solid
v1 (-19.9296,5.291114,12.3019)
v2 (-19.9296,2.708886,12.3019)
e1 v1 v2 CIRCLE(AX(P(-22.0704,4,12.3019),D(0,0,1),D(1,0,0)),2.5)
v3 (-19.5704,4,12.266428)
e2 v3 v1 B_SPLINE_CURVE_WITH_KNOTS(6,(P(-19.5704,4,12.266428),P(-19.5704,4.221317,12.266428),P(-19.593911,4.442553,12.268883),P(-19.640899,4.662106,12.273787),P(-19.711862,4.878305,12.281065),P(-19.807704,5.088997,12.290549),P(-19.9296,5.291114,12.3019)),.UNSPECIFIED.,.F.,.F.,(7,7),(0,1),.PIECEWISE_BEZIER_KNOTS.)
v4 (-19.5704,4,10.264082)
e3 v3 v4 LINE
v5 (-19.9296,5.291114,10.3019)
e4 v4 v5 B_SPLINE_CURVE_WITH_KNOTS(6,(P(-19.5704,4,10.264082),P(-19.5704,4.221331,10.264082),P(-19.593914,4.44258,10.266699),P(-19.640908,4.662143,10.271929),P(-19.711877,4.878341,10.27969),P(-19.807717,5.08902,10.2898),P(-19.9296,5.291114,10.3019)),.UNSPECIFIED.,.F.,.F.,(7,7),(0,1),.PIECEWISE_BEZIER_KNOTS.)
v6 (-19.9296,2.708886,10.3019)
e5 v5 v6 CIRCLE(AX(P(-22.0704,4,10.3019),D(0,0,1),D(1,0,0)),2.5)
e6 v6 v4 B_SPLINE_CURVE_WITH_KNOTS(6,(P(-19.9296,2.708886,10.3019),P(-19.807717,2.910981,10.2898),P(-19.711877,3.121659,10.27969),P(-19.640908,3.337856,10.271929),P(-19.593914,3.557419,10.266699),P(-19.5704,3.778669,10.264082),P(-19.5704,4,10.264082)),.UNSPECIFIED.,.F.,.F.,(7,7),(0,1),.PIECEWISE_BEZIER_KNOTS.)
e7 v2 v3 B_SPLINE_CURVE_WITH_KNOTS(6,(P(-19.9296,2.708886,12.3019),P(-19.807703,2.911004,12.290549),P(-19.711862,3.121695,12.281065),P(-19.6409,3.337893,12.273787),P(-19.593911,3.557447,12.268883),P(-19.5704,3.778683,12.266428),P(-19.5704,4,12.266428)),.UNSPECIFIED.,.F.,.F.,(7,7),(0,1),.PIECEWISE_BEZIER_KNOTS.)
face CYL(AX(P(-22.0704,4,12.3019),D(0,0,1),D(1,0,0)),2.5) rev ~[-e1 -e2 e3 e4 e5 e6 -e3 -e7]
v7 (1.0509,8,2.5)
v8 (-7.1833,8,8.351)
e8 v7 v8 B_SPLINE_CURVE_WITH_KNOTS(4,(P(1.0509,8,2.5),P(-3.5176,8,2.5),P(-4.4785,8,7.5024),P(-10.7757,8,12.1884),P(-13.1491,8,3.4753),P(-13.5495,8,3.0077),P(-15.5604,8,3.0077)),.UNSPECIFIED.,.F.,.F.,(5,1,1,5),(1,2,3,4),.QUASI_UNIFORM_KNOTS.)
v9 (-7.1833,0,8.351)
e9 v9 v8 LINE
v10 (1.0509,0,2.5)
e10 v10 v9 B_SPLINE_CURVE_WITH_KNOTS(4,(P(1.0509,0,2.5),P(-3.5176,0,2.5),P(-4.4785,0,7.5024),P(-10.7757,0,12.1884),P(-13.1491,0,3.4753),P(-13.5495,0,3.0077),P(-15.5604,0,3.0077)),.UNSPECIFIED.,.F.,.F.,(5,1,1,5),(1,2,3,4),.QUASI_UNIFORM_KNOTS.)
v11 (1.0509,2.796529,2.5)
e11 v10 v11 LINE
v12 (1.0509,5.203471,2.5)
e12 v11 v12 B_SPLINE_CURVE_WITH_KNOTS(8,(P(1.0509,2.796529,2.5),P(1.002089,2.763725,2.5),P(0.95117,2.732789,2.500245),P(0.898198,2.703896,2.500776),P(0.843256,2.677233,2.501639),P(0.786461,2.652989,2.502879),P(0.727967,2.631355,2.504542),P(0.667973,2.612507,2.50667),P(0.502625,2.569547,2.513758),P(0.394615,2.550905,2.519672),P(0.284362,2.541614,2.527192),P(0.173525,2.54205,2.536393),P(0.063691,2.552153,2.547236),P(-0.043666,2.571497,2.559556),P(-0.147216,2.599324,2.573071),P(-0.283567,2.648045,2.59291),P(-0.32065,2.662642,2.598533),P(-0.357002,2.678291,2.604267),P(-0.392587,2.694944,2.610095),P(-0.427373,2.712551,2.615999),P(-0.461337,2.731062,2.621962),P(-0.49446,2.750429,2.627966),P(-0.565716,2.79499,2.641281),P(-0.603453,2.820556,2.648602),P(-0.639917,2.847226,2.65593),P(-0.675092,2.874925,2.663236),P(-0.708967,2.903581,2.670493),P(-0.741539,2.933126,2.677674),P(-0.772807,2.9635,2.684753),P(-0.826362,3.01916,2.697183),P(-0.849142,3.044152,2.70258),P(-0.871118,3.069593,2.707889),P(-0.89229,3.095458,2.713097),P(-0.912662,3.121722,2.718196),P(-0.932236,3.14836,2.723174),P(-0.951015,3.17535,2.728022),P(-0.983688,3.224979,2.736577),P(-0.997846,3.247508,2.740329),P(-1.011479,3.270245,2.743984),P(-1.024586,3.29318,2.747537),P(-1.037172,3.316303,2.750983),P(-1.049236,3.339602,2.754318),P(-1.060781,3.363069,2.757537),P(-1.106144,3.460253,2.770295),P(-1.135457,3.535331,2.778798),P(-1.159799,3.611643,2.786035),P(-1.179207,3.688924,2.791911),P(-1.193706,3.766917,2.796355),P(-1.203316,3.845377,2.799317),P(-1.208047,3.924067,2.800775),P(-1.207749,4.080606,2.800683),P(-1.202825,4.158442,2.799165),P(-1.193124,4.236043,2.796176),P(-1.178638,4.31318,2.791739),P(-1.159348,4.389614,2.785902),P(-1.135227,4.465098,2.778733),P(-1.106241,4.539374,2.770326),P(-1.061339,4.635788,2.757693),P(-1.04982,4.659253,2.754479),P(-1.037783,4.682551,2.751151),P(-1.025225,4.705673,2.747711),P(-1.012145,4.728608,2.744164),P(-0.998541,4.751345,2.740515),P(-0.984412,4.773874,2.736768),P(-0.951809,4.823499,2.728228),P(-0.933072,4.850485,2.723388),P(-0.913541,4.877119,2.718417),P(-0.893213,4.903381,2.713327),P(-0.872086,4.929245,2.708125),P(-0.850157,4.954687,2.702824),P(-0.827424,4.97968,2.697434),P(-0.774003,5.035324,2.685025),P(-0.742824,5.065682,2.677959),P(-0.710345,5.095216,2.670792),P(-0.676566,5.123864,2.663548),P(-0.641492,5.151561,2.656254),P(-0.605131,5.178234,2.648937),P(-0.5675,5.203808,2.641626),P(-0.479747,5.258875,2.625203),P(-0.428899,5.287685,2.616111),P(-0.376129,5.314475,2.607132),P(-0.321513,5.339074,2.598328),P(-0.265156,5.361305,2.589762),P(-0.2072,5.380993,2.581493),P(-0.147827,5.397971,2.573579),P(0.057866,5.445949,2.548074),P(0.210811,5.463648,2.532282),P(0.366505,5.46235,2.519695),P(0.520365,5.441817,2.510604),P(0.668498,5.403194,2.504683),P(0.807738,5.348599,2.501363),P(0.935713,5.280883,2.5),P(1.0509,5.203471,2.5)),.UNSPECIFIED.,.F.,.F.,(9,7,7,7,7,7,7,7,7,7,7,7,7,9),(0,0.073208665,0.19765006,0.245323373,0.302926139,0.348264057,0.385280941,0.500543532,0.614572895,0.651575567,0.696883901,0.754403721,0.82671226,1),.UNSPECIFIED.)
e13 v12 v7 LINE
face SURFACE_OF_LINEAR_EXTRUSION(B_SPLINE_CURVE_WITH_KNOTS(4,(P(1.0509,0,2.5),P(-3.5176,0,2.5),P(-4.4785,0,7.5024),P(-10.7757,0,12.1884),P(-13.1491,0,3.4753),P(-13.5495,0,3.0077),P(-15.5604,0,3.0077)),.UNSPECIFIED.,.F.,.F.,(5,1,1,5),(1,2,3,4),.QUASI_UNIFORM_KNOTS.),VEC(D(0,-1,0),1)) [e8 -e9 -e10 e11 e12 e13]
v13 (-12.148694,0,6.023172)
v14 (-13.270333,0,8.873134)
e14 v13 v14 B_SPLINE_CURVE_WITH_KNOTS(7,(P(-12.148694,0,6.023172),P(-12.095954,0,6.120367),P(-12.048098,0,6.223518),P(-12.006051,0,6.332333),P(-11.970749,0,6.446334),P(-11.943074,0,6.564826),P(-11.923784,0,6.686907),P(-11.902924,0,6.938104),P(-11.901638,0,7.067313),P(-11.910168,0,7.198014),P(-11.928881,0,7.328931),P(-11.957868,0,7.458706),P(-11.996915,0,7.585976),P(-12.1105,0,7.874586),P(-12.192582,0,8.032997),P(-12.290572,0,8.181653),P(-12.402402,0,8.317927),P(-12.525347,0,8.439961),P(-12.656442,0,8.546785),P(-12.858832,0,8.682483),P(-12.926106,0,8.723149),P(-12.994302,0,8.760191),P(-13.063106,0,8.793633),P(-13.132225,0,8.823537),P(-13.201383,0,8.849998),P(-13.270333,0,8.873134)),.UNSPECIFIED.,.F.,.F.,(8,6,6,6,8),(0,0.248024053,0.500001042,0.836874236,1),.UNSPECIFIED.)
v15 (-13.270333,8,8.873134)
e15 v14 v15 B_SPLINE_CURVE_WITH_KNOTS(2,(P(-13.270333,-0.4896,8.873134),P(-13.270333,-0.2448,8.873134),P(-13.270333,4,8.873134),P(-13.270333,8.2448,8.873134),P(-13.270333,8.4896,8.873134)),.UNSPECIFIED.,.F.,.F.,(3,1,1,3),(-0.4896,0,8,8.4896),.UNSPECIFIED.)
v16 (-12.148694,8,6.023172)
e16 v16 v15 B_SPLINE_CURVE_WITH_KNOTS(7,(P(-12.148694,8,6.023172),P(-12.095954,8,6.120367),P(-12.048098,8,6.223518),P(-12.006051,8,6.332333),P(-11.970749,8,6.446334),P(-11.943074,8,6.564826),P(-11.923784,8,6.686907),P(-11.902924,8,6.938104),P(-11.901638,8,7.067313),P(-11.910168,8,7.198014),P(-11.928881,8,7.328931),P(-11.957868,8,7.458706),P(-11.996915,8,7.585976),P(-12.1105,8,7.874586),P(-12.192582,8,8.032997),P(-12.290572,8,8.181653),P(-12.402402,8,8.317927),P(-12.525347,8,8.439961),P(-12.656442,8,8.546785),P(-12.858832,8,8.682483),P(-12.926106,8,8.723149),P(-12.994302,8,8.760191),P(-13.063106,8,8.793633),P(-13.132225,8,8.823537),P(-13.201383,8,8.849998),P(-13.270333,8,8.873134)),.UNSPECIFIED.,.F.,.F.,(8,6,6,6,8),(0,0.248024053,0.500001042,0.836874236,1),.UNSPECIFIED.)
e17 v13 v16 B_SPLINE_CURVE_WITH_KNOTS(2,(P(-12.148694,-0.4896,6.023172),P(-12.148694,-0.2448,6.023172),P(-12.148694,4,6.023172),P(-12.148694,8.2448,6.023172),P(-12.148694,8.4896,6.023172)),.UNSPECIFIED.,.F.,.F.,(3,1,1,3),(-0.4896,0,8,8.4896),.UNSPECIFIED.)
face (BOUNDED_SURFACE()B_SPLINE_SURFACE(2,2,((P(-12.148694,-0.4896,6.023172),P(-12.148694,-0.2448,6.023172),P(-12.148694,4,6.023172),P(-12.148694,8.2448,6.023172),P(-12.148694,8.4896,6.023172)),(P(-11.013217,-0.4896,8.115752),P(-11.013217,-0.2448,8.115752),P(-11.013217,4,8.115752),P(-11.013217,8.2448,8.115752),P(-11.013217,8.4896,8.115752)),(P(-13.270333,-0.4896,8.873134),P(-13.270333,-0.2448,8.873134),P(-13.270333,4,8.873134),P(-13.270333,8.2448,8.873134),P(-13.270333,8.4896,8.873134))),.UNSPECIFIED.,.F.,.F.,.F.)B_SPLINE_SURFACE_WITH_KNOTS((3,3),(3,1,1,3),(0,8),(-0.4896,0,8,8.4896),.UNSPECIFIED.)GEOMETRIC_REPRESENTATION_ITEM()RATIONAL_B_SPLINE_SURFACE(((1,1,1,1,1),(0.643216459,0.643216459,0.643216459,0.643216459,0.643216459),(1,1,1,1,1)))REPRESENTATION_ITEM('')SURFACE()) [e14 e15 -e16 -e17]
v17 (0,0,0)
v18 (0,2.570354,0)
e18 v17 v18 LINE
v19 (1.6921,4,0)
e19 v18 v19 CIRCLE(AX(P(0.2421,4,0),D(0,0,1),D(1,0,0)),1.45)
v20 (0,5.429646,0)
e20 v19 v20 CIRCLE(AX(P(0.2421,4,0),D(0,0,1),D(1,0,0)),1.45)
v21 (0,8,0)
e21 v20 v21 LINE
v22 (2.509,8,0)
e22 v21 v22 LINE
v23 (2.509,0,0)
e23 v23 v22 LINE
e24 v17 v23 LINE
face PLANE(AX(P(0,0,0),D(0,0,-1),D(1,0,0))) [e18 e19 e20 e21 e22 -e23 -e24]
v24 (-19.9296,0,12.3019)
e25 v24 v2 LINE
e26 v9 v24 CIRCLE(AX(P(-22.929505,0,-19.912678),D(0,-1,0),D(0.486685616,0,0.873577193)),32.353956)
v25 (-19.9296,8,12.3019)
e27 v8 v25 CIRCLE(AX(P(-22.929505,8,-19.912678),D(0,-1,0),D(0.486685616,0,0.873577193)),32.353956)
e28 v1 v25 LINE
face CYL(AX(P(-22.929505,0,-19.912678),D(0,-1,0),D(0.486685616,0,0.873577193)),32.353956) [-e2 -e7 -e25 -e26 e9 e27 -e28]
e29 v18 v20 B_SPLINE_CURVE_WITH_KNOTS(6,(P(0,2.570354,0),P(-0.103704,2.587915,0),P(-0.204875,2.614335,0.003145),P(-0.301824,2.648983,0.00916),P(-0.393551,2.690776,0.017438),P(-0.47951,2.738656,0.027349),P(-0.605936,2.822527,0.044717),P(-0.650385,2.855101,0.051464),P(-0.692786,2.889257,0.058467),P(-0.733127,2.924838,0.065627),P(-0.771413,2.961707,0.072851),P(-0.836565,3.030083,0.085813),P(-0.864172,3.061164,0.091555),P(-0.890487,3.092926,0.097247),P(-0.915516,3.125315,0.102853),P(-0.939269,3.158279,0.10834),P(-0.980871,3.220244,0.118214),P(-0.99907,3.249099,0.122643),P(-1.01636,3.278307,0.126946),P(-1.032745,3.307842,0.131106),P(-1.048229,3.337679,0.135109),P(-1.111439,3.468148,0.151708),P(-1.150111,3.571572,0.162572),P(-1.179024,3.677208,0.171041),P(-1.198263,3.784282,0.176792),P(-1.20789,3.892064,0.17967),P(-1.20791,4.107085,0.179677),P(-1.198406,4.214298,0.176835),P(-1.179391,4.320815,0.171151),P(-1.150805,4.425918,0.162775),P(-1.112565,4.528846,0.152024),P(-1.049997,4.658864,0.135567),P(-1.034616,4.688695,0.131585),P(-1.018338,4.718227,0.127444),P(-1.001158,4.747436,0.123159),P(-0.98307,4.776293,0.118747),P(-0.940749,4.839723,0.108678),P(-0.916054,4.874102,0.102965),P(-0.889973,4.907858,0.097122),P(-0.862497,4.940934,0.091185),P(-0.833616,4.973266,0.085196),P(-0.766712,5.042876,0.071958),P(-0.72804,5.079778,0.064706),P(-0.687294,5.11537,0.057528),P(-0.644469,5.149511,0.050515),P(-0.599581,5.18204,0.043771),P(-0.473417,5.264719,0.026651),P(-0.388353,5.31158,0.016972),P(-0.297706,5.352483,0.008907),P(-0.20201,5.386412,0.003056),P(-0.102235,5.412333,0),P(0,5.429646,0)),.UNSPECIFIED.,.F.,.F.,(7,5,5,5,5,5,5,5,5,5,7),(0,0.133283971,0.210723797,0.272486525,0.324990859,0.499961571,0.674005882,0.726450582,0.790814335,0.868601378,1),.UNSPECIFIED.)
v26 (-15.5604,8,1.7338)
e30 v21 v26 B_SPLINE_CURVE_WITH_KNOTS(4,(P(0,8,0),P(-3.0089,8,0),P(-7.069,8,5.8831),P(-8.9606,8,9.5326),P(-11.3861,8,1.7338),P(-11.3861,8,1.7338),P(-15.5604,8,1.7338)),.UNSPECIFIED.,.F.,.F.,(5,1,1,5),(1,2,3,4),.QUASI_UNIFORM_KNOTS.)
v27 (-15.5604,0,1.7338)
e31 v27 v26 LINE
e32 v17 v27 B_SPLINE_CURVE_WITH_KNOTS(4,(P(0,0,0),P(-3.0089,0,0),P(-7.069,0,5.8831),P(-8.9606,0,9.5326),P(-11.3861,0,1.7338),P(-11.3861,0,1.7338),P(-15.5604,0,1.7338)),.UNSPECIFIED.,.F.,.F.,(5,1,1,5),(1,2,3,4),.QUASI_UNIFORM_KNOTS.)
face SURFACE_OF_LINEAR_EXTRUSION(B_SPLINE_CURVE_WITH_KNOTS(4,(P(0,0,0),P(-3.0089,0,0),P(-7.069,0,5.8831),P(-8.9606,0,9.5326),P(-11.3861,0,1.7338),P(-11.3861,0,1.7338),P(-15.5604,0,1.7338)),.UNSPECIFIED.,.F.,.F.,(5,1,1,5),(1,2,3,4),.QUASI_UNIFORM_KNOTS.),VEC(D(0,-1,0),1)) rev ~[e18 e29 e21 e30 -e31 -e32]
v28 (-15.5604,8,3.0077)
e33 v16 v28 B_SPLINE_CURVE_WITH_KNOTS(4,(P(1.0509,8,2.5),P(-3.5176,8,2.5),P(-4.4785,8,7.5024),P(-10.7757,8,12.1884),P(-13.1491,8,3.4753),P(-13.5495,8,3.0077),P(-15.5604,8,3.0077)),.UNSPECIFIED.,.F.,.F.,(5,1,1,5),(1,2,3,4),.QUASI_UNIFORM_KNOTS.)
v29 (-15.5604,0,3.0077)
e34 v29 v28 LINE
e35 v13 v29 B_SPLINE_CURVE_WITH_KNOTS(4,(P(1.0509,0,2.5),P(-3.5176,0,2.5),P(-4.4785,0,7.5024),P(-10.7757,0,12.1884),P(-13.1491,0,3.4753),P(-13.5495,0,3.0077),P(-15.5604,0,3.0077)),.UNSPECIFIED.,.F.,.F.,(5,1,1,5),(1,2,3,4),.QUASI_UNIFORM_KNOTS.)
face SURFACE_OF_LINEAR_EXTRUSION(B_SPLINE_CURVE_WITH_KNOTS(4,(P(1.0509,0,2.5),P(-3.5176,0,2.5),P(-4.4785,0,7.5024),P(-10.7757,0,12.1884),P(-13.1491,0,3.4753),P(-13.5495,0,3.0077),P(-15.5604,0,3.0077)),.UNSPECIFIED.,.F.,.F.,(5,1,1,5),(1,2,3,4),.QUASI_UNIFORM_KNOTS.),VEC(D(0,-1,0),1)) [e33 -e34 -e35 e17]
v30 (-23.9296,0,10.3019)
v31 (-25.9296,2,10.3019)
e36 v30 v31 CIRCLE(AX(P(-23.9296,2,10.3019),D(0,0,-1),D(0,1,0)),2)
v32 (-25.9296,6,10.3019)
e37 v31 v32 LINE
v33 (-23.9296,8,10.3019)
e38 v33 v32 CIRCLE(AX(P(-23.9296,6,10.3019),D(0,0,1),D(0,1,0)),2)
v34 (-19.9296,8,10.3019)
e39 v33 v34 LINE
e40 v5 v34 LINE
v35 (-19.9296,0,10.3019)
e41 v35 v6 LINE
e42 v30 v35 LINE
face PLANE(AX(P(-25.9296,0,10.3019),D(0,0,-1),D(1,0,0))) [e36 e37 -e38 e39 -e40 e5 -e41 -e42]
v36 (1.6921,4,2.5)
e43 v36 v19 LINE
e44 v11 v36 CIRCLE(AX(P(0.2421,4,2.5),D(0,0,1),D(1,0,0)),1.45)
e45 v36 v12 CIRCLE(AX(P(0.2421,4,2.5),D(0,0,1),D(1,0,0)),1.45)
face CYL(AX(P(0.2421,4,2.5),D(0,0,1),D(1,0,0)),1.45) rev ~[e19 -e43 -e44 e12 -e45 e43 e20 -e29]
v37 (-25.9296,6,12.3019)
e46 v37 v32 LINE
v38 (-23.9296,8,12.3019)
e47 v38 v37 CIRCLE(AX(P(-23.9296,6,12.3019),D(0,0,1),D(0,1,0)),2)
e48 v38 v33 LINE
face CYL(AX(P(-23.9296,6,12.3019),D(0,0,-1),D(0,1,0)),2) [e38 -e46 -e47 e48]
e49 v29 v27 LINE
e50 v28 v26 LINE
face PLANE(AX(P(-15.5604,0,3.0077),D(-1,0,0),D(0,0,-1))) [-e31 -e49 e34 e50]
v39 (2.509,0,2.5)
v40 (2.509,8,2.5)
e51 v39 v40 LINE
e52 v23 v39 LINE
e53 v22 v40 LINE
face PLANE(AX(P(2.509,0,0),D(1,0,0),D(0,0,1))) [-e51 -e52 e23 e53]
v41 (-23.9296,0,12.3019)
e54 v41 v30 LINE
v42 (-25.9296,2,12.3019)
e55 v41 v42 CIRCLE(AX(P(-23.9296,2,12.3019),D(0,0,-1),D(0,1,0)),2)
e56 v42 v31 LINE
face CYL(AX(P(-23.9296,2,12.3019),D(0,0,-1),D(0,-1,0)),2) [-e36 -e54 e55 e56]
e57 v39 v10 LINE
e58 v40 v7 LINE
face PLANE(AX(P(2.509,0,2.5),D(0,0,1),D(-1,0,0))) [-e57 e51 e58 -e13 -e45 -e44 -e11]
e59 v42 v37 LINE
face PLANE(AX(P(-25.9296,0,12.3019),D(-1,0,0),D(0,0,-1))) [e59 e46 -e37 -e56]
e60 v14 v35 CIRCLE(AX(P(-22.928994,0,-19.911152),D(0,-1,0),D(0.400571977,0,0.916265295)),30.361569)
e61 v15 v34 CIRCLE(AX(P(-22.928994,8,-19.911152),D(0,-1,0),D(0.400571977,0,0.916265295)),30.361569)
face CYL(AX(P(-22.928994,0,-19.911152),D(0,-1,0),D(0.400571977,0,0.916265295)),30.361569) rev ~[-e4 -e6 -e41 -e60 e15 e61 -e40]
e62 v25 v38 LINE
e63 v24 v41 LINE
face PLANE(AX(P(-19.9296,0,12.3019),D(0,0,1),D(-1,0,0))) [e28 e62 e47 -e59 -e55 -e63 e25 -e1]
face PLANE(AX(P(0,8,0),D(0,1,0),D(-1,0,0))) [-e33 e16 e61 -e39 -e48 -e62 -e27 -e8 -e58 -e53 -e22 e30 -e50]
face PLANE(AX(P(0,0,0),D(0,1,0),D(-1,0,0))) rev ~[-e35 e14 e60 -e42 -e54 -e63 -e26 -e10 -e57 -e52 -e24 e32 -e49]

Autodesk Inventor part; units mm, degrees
ref_plane "YZ Plane" through (0, 0, 0) normal (1, 0, 0) x (0, 1, 0)
ref_plane "XZ Plane" through (0, 0, 0) normal (0, 1, 0) x (-1, 0, 0)
ref_plane "XY Plane" through (0, 0, 0) normal (0, 0, 1) x (1, 0, 0)
sketch "Sketch1" plane through (0, 0, 0) normal (0, 1, 0) x (-1, 0, 0)
  line L0 (0, 0) -> (3.0089, 0) construction
  line L1 (3.0089, 0) -> (7.069, 5.8831) construction
  line L2 (7.069, 5.8831) -> (8.9606, 9.5326) construction
  line L3 (8.9606, 9.5326) -> (11.3861, 1.7338) construction
  line L4 (11.3861, 1.7338) -> (15.5604, 1.7338) construction
  spline S0 degree 4 poles (0, 0) (3.0089, 0) (7.069, 5.8831) (8.9606, 9.5326) (11.3861, 1.7338) (11.3861, 1.7338) (15.5604, 1.7338) knots 1 1 1 1 1 2 3 4 4 4 4 4
  line L5 (0, 0) -> (-2.509, 0)
  line L6 (-2.509, 0) -> (-2.509, 2.5)
  line L7 (-2.509, 2.5) -> (-1.0509, 2.5)
  line L8 (-1.0509, 2.5) -> (3.5176, 2.5) construction
  line L9 (3.5176, 2.5) -> (4.4785, 7.5024) construction
  line L10 (4.4785, 7.5024) -> (10.7757, 12.1884) construction
  line L11 (10.7757, 12.1884) -> (13.1491, 3.4753) construction
  line L12 (13.1491, 3.4753) -> (13.5495, 3.0077) construction
  line L13 (13.5495, 3.0077) -> (15.5604, 3.0077) construction
  spline S1 degree 4 poles (-1.0509, 2.5) (3.5176, 2.5) (4.4785, 7.5024) (10.7757, 12.1884) (13.1491, 3.4753) (13.5495, 3.0077) (15.5604, 3.0077) knots 1 1 1 1 1 2 3 4 4 4 4 4
  line L14 (15.5604, 3.0077) -> (15.5604, 1.7338)
  dimension "d0" = 2.5
extrude "Extrusion1" add sketch "Sketch1" along normal blind 8
sketch "Sketch2" plane through (1.0509, 0, 2.5) normal (0, 0, 1) x (1, 0, 0)
  circle A0 centre (-0.8088, 4) radius 1.45
  line L0 (-16.6113, 8) -> (0, 8) projected
  point P0 (-1.0509, 0)
  dimension "d3" = 2.9
  dimension "d14" = 4
extrude "Extrusion2" cut sketch "Sketch2" along normal mid plane 7
sketch "Sketch3" plane through (0, 0, 0) normal (0, -1, 0) x (1, 0, 0)
  line L0 (2.509, 0) -> (0, 0) projected
  line L1 (2.509, 2.5) -> (2.509, 0) projected
  line L2 (1.0509, 2.5) -> (2.509, 2.5) projected
  spline S0 degree 4 poles (-15.5604, 3.0077) (-13.5495, 3.0077) (-13.1491, 3.4753) (-10.7757, 12.1884) (-4.4785, 7.5024) (-3.5176, 2.5) (1.0509, 2.5) knots 0 0 0 0 0 0.333333 0.666667 1 1 1 1 1 projected
  line L3 (-15.5604, 1.7338) -> (-15.5604, 3.0077) projected
  arc A0 (-7.1833, 8.351) -> (-19.9296, 12.3019) centre (-22.9296, -19.9129) ccw
  arc A1 (-10.767, 7.9081) -> (-19.9296, 10.3019) centre (-22.9296, -19.9129) ccw
  line L4 (-19.9296, 12.3019) -> (-19.9296, 10.3019)
  line L5 (-19.9296, 12.3019) -> (-25.9296, 12.3019)
  line L6 (-25.9296, 12.3019) -> (-25.9296, 10.3019)
  line L7 (-25.9296, 10.3019) -> (-19.9296, 10.3019)
  line L8 (-19.9296, 10.3019) -> (-19.9296, 12.3019)
  dimension "d6" = 6
  dimension "d7" = 2
extrude "Extrusion3" add sketch "Sketch3" against normal up to surface (8 mm away)
sketch "Sketch4" plane through (-25.9296, 0, 12.3019) normal (0, 0, 1) x (1, 0, 0)
  arc A0 (0.3271, 6.628) -> (0.3271, 0.742) centre (3.8271, 3.685) ccw projected
  arc A1 (26.9804, 2.7965) -> (26.9804, 5.2035) centre (26.1717, 4) ccw projected
  circle A2 centre (3.8592, 4) radius 2.5
  point P0 (25.9296, 0)
  dimension "d10" = 5
extrude "Extrusion4" cut sketch "Sketch4" against normal blind 10
fillet "Fillet1" radius 2 3 edges at (-25.9296, 0, 11.3019) (-25.9296, 8, 11.3019) (-10.767, 4, 7.9081)
properties part number "30_Cube_Chipadapter_Fluicis_clamp"
